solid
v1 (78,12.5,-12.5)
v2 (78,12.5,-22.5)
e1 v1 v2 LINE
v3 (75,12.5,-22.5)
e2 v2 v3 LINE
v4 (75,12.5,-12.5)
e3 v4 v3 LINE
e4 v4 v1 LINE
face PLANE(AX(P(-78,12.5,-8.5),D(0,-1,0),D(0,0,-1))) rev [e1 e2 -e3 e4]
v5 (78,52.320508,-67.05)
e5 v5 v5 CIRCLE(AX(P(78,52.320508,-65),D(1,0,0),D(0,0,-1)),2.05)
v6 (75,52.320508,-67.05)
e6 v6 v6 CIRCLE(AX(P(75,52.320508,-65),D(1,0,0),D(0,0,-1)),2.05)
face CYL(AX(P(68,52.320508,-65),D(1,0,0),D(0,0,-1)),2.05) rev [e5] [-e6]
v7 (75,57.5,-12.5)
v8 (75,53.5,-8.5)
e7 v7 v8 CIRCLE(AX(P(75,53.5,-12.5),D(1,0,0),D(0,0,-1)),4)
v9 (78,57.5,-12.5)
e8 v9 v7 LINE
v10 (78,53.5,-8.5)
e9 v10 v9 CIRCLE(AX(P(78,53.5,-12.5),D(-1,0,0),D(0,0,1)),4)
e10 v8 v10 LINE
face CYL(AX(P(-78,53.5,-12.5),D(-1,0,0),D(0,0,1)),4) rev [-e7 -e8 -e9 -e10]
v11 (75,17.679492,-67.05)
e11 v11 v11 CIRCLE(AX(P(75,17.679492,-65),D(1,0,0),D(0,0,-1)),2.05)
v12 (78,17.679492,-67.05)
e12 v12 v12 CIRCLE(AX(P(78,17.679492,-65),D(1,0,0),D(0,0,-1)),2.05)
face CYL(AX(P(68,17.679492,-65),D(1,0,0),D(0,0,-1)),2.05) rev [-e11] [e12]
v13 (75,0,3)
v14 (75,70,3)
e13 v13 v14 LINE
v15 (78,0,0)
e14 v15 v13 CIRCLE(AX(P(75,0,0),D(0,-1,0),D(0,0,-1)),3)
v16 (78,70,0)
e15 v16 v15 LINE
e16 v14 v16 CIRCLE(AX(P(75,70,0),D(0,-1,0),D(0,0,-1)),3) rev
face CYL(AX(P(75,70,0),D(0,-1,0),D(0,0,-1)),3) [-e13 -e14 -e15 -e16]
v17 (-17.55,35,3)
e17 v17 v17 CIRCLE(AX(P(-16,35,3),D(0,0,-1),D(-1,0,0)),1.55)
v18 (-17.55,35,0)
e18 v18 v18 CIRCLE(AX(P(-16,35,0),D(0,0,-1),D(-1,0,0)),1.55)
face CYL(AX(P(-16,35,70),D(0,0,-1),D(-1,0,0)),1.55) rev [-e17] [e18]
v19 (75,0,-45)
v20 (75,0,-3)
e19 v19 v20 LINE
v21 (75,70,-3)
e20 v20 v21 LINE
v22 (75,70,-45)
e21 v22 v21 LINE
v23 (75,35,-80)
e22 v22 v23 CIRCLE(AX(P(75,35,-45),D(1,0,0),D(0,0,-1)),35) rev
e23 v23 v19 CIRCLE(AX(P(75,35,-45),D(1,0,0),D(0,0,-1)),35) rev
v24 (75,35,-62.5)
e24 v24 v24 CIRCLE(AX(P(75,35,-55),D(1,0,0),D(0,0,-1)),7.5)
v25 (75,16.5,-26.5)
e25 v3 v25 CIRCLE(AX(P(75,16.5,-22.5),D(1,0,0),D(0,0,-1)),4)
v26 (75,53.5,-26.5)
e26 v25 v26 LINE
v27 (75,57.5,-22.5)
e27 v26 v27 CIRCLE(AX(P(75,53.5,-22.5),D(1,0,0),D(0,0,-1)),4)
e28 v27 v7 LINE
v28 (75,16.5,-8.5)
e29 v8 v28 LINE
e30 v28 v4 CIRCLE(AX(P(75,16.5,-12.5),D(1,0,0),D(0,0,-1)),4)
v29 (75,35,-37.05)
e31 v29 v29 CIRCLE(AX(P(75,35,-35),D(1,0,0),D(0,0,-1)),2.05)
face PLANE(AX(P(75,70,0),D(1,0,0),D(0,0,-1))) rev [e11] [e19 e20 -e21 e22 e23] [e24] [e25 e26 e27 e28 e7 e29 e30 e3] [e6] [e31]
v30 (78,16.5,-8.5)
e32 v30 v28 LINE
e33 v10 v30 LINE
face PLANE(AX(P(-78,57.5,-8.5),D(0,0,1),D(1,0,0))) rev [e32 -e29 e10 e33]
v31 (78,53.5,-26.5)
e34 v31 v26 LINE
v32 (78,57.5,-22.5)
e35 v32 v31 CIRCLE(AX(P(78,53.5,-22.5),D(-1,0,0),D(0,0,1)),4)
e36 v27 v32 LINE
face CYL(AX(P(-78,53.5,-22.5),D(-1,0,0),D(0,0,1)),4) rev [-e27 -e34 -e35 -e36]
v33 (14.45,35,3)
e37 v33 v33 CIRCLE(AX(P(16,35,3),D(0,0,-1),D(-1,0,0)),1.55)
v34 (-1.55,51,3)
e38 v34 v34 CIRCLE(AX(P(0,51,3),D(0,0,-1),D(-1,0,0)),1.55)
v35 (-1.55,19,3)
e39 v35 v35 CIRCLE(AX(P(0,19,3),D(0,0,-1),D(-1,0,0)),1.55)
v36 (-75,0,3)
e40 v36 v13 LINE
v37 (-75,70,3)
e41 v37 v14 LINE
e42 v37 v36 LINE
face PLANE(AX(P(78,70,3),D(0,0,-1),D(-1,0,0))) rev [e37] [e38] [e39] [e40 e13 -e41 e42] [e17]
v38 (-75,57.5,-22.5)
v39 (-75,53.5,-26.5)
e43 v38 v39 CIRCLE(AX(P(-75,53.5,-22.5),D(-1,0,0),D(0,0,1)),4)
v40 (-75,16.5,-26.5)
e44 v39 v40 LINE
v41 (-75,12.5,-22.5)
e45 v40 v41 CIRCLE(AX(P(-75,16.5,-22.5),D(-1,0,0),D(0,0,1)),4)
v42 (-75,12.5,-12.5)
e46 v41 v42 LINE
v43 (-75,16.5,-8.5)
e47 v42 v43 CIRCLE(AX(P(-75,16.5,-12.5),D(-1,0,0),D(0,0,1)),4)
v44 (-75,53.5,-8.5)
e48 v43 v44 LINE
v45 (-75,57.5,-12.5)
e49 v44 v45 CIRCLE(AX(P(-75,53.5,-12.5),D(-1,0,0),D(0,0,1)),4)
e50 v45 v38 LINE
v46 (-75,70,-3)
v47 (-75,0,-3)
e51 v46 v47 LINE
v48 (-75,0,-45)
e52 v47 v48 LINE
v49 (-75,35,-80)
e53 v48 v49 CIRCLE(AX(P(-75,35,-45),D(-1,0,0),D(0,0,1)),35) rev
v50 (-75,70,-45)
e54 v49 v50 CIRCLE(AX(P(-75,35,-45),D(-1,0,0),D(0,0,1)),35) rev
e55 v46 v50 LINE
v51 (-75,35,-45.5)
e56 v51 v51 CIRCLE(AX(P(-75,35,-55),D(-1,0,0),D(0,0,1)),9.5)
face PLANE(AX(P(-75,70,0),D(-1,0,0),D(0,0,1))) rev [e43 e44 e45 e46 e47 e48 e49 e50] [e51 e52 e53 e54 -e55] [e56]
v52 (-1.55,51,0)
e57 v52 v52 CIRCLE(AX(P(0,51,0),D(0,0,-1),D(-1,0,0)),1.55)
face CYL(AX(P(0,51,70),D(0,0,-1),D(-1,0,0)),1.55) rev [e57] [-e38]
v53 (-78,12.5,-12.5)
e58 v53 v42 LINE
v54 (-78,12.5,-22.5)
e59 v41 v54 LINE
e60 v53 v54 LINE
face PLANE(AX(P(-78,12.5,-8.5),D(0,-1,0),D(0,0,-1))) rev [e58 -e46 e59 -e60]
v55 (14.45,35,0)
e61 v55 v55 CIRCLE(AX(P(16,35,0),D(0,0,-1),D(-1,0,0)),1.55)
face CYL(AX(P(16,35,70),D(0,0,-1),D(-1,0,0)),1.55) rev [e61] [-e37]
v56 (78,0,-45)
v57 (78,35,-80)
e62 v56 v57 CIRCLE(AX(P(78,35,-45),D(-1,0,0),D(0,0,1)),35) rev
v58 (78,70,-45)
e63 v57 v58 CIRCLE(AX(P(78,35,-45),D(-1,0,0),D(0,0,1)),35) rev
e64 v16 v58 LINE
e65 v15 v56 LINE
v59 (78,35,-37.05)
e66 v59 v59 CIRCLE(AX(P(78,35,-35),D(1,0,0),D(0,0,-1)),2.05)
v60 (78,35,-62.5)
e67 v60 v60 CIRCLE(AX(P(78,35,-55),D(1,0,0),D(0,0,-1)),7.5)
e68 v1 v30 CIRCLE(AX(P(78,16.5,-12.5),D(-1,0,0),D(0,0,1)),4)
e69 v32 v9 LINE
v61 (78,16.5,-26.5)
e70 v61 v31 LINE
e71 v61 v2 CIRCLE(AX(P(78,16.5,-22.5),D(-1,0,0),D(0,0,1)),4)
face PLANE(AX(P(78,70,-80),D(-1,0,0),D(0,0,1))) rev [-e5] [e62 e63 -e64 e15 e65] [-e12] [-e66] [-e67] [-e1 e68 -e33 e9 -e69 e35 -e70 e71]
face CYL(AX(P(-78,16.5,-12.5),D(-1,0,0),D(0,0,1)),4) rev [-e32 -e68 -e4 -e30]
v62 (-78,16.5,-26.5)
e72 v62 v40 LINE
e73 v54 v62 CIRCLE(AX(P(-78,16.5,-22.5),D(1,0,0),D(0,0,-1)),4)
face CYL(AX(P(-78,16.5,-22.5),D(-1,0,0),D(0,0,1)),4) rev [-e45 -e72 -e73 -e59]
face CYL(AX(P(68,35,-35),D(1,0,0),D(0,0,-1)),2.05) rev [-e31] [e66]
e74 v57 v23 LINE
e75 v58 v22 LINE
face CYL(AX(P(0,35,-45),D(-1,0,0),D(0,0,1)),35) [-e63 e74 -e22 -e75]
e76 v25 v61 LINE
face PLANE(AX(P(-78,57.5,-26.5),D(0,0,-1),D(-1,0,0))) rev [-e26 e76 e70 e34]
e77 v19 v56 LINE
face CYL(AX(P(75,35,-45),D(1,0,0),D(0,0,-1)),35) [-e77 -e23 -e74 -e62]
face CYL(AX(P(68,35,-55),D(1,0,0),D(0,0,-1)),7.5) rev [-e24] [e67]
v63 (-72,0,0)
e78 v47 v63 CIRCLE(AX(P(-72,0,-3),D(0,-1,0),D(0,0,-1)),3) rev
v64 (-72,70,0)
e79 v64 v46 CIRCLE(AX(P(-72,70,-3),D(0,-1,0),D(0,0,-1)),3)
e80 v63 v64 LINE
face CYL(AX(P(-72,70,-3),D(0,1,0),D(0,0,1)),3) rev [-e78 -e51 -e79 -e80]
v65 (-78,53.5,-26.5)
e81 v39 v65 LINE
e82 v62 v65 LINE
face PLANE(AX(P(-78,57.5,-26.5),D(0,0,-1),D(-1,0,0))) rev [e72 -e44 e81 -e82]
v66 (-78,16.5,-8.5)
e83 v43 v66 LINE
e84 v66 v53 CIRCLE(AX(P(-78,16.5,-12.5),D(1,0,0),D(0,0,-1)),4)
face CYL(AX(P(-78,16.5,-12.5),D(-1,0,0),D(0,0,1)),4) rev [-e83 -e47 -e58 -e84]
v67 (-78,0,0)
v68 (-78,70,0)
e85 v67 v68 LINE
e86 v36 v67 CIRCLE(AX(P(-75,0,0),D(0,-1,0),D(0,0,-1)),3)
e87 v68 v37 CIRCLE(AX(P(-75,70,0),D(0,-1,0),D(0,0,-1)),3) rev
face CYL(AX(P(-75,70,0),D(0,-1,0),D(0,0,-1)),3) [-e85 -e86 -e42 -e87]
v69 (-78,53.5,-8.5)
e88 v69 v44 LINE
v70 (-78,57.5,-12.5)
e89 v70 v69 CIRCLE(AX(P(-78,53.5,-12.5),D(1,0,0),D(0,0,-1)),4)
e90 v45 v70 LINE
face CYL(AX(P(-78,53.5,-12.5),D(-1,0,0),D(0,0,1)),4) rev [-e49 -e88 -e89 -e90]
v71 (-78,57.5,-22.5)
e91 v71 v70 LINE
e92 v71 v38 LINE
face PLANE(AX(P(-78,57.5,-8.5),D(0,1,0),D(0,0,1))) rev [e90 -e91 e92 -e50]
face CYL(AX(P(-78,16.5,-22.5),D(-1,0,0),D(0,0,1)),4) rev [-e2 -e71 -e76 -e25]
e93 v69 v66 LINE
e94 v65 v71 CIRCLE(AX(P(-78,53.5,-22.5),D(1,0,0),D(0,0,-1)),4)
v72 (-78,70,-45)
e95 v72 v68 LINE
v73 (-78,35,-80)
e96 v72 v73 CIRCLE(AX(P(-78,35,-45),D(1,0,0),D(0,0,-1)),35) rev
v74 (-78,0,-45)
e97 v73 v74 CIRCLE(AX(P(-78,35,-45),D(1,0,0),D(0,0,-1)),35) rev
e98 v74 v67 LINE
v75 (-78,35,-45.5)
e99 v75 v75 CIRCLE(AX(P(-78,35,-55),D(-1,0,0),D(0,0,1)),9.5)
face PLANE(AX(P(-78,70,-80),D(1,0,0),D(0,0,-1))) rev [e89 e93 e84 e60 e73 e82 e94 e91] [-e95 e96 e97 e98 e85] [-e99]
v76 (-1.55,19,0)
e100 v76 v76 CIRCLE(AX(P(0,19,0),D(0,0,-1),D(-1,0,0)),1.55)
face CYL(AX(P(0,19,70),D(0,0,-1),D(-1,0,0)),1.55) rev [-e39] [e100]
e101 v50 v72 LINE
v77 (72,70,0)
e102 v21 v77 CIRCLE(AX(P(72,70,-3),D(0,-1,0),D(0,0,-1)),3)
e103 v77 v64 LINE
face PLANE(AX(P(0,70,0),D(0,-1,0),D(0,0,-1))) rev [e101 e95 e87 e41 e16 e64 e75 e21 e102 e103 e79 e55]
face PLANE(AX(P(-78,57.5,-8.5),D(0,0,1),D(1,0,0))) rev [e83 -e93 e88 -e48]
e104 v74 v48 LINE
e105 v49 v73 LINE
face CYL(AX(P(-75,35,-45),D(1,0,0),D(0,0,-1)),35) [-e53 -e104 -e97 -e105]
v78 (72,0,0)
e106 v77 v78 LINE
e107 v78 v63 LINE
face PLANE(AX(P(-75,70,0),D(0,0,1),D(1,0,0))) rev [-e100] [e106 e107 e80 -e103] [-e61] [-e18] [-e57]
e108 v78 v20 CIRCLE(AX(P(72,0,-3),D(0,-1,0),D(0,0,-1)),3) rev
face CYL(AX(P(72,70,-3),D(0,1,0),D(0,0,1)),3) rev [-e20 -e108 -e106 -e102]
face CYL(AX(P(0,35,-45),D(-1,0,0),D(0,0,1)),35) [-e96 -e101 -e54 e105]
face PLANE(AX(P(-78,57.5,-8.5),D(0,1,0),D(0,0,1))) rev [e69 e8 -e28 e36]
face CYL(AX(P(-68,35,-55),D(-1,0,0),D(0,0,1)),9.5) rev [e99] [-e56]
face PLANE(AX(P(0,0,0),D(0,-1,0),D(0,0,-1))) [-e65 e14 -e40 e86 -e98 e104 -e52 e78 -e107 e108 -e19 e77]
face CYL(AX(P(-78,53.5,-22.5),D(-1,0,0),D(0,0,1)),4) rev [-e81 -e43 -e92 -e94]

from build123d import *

# Parameters (mm, degrees)
EXTRUDE_1_DEPTH       = 70
FILLET_1_R            = 3
SKETCH_4_R            = 1.55
CUT_EXTRUDE_3_1_DEPTH = 70
SKETCH_13_R           = 2.05
SKETCH_13_R_2         = 7.5
CUT_EXTRUDE_8_DEPTH   = 10
FILLET_6_R            = 35
SKETCH_14_R           = 9.5
CUT_EXTRUDE_9_DEPTH   = 10
SKETCH_15_W           = 18
SKETCH_15_H           = 45
CUT_EXTRUDE_11_DEPTH  = 189.774998345
FILLET_7_R            = 4


with BuildPart() as part:
    # 草图1 → 凸台-拉伸1 (new body)
    with BuildSketch(Plane(origin=(0, 0, 0), x_dir=(1, 0, 0), z_dir=(0, 1, 0))):
        Polygon((-75, 0), (75, 0), (75, 80), (78, 80), (78, -3), (-78, -3), (-78, 80), (-75, 80), align=None)
    extrude(amount=EXTRUDE_1_DEPTH)

    # 圆角1
    fillet_1_edges = [part.edges().sort_by_distance(p)[0] for p in [
        (78, 35, 3),
        (-78, 35, 3),
        (-75, 35, 0),
        (75, 35, 0),
    ]]
    fillet(fillet_1_edges, radius=FILLET_1_R)

    # 草图4 → φ3.1通孔 (cut)
    with BuildSketch(Plane(origin=(0, 0, 0), x_dir=(-1, 0, 0), z_dir=(0, 0, -1))):
        with Locations((0, 51)):
            Circle(SKETCH_4_R)
        with Locations((16, 35)):
            Circle(SKETCH_4_R)
        with Locations((0, 19)):
            Circle(SKETCH_4_R)
        with Locations((-16, 35)):
            Circle(SKETCH_4_R)
    extrude(amount=-CUT_EXTRUDE_3_1_DEPTH, mode=Mode.SUBTRACT)

    # 草图13 → 切除-拉伸8 (cut)
    with BuildSketch(Plane(origin=(78, 0, 0), x_dir=(0, 0, -1), z_dir=(1, 0, 0))):
        with Locations((35, 35)):
            Circle(SKETCH_13_R)
        with Locations((65, 52.320508076)):
            Circle(SKETCH_13_R)
        with Locations((65, 17.679491924)):
            Circle(SKETCH_13_R)
        with Locations((55, 35)):
            Circle(SKETCH_13_R_2)
    extrude(amount=-CUT_EXTRUDE_8_DEPTH, mode=Mode.SUBTRACT)

    # 圆角6
    fillet_6_edges = [part.edges().sort_by_distance(p)[0] for p in [
        (-76.5, 70, -80),
        (-76.5, 0, -80),
        (76.5, 70, -80),
        (76.5, 0, -80),
    ]]
    fillet(fillet_6_edges, radius=FILLET_6_R - 0.0001)  # a hair under: the kernel refuses the full size

    # 草图14 → 切除-拉伸9 (cut)
    with BuildSketch(Plane.ZY.offset(78)):
        with Locations((-55, 35)):
            Circle(SKETCH_14_R)
    extrude(amount=-CUT_EXTRUDE_9_DEPTH, mode=Mode.SUBTRACT)

    # 草图15 → 切除-拉伸11 (cut, through all)
    with BuildSketch(Plane(origin=(78, 0, 0), x_dir=(0, 0, -1), z_dir=(1, 0, 0))):
        with Locations((17.5, 35)):
            Rectangle(SKETCH_15_W, SKETCH_15_H)
    extrude(amount=-CUT_EXTRUDE_11_DEPTH, mode=Mode.SUBTRACT)

    # 圆角7
    fillet_7_edges = [part.edges().sort_by_distance(p)[0] for p in [
        (76.5, 57.5, -26.5),
        (-76.5, 57.5, -26.5),
        (76.5, 12.5, -26.5),
        (-76.5, 12.5, -26.5),
        (76.5, 12.5, -8.5),
        (-76.5, 12.5, -8.5),
        (76.5, 57.5, -8.5),
        (-76.5, 57.5, -8.5),
    ]]
    fillet(fillet_7_edges, radius=FILLET_7_R)


solid = part.part
